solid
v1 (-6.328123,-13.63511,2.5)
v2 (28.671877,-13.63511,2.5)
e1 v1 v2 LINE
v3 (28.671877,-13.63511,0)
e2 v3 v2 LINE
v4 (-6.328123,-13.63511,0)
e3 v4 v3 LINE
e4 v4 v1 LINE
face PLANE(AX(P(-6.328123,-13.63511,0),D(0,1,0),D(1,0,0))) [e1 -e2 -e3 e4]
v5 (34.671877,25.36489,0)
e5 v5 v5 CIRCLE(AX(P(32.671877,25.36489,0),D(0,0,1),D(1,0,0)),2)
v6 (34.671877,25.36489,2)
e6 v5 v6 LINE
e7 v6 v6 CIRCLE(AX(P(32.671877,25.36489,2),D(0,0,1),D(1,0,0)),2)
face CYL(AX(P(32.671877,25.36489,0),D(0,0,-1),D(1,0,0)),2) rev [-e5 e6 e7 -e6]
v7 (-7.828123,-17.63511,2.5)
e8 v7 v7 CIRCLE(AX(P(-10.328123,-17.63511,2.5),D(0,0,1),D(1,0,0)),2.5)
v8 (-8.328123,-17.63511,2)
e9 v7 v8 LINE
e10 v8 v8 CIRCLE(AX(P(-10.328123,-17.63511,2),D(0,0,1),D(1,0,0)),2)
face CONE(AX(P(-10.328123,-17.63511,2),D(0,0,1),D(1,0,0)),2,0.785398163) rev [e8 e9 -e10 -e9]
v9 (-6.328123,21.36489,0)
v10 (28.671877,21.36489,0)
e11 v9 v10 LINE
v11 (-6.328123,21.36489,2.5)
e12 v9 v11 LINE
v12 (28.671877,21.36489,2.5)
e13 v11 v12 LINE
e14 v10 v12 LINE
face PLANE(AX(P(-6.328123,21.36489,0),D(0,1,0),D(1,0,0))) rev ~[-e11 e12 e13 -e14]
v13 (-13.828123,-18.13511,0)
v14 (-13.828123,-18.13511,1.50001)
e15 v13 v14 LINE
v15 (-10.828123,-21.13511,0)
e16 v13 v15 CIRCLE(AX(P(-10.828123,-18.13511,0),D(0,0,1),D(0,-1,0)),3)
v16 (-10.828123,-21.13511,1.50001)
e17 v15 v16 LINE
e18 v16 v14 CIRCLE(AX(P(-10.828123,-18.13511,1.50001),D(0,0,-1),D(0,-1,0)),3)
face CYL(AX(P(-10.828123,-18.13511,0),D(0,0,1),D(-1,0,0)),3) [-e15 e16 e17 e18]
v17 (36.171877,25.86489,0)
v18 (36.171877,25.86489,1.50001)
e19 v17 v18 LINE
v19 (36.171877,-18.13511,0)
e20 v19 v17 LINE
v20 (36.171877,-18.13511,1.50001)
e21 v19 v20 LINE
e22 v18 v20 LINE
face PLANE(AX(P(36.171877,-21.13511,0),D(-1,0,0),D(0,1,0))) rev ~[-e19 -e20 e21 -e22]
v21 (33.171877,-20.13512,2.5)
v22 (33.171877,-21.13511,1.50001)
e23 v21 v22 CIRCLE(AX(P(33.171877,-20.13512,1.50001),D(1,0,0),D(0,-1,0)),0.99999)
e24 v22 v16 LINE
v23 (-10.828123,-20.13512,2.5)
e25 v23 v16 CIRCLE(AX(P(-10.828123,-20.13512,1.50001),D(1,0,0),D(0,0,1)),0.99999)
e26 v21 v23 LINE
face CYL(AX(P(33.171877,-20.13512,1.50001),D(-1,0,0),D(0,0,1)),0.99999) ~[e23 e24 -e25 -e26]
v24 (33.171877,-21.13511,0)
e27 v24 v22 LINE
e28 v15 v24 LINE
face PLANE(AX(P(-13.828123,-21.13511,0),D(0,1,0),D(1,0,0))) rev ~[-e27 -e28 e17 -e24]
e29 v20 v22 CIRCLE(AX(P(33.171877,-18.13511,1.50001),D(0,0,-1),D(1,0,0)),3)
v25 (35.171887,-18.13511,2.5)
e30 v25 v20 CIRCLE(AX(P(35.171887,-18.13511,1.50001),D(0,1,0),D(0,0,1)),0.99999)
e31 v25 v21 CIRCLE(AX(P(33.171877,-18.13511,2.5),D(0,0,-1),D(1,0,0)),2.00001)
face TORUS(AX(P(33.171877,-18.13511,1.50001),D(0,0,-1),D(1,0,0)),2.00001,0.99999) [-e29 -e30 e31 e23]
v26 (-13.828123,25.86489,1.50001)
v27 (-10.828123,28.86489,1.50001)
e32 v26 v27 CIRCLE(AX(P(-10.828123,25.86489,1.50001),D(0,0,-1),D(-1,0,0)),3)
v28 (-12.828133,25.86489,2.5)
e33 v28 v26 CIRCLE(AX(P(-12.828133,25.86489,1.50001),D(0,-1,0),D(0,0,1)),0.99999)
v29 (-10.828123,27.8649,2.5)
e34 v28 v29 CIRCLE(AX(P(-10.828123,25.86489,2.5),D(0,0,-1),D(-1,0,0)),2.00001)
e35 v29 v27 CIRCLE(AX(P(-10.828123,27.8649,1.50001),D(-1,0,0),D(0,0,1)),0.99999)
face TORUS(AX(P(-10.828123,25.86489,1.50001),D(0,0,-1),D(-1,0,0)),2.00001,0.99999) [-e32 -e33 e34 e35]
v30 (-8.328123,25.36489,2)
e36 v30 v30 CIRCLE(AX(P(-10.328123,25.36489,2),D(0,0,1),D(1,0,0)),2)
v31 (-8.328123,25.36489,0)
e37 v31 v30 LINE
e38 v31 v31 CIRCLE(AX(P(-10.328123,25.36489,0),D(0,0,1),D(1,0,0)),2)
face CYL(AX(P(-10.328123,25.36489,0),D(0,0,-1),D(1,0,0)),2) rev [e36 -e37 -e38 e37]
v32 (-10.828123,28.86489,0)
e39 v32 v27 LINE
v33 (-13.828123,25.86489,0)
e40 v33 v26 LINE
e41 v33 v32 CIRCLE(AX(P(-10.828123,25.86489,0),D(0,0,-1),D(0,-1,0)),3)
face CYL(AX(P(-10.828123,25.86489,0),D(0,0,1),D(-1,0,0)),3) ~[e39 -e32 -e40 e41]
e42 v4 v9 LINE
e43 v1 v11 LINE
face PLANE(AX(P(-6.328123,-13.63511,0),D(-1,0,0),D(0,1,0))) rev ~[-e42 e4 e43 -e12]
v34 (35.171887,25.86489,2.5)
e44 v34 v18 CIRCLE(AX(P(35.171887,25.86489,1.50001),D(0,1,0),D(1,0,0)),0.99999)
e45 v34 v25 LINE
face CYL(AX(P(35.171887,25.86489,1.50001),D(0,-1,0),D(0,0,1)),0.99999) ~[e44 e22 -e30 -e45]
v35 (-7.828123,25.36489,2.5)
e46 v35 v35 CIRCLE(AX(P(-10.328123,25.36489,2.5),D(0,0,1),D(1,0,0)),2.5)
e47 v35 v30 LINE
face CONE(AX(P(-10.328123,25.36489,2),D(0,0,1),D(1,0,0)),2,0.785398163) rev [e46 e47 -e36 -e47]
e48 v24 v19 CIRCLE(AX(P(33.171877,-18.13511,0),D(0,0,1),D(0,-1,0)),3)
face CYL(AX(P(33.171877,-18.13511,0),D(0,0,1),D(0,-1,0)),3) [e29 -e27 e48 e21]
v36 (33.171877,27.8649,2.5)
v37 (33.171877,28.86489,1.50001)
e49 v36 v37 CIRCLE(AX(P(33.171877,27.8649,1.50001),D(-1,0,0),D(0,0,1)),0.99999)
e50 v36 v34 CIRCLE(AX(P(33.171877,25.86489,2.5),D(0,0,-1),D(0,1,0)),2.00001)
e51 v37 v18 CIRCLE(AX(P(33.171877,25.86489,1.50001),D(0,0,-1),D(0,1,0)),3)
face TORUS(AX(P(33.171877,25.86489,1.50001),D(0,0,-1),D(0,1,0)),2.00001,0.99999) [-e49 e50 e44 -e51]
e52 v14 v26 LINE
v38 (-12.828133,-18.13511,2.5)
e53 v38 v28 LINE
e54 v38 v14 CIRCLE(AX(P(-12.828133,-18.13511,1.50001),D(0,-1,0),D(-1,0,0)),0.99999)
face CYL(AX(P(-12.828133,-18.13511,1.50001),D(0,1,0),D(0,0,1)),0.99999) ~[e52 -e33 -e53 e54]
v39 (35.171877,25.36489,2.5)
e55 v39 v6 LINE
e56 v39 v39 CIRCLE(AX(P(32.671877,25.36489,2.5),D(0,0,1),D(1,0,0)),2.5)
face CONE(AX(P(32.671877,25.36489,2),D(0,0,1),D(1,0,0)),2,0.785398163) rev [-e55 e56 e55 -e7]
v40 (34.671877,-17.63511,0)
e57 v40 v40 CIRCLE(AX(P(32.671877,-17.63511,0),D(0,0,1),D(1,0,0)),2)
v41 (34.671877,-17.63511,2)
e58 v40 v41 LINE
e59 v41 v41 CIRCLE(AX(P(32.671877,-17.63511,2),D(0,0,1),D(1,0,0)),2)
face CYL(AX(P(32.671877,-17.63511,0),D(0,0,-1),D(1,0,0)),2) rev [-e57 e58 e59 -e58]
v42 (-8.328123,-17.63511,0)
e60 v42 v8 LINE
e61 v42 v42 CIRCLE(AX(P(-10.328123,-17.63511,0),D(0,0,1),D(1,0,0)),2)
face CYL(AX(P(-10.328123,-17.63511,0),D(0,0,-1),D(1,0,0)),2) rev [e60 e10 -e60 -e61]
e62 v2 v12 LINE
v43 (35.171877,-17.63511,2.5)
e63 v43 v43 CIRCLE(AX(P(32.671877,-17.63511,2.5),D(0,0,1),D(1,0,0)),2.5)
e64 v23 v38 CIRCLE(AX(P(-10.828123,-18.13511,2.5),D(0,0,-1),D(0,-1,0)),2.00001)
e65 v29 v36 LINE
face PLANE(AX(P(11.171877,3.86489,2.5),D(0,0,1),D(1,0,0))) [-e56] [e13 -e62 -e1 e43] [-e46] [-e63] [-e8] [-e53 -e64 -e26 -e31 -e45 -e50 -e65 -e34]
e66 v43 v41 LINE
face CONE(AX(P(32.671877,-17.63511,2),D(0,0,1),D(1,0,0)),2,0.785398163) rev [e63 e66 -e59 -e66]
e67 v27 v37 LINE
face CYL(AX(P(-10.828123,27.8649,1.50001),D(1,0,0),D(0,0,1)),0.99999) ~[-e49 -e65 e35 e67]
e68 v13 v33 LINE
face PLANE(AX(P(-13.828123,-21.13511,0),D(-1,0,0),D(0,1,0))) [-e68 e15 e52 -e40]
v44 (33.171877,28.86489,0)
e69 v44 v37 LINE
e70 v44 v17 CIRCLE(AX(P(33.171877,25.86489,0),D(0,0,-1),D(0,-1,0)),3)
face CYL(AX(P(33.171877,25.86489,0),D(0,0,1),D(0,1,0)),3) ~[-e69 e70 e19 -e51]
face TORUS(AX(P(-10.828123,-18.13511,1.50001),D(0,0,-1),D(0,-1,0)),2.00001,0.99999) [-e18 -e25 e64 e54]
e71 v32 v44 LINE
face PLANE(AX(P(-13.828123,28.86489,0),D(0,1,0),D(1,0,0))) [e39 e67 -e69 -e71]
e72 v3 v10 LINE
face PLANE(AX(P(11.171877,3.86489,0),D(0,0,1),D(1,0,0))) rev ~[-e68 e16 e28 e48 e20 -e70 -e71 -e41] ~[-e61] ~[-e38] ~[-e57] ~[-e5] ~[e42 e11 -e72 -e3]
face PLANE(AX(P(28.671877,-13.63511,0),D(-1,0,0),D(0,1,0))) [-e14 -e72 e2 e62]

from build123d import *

# Parameters (mm, degrees)
F0_W     = 50
F0_H     = 50
F0_R     = 2
F0_W_2   = 35
F0_H_2   = 35
F1_DEPTH = 2.5
F2_R     = 3
F3_SIZE  = 0.5
F4_R     = 0.99999


# Not quite as in the source:
# - a fillet or chamfer is up to 0.001 mm smaller than in the source, because OpenCascade refuses the exact size


with BuildPart() as f1:
    # F0 (on Top) → F1 (new body)
    with BuildSketch(Plane.XY):
        with Locations((11.1718769372, 3.8648895919)):
            Rectangle(F0_W, F0_H)
        with Locations((-10.3281230628, -17.6351104081)):
            Circle(F0_R, mode=Mode.SUBTRACT)
        with Locations((32.6718769372, -17.6351104081)):
            Circle(F0_R, mode=Mode.SUBTRACT)
        with Locations((11.1718769372, 3.8648895919)):
            Rectangle(F0_W_2, F0_H_2, mode=Mode.SUBTRACT)
        with Locations((-10.3281230628, 25.3648895919)):
            Circle(F0_R, mode=Mode.SUBTRACT)
        with Locations((32.6718769372, 25.3648895919)):
            Circle(F0_R, mode=Mode.SUBTRACT)
    extrude(amount=F1_DEPTH)

    # F2
    f2_edges = [f1.edges().sort_by_distance(p)[0] for p in [
        (-13.828123, 28.86489, 1.25),
        (36.171877, 28.86489, 1.25),
        (36.171877, -21.13511, 1.25),
        (-13.828123, -21.13511, 1.25),
    ]]
    fillet(f2_edges, radius=F2_R)

    # F3
    f3_edges = [f1.edges().sort_by_distance(p)[0] for p in [
        (-12.328123, 25.36489, 2.5),
        (30.671877, 25.36489, 2.5),
        (30.671877, -17.63511, 2.5),
        (-12.328123, -17.63511, 2.5),
    ]]
    chamfer(f3_edges, length=F3_SIZE)

    # F4 (radius 1 in the source; OpenCascade refuses exactly that, so slightly less here)
    f4_edges = [f1.edges().sort_by_distance(p)[0] for p in [
        (11.171877, 28.86489, 2.5),
    ]]
    fillet(f4_edges, radius=F4_R)


solid = f1.part
